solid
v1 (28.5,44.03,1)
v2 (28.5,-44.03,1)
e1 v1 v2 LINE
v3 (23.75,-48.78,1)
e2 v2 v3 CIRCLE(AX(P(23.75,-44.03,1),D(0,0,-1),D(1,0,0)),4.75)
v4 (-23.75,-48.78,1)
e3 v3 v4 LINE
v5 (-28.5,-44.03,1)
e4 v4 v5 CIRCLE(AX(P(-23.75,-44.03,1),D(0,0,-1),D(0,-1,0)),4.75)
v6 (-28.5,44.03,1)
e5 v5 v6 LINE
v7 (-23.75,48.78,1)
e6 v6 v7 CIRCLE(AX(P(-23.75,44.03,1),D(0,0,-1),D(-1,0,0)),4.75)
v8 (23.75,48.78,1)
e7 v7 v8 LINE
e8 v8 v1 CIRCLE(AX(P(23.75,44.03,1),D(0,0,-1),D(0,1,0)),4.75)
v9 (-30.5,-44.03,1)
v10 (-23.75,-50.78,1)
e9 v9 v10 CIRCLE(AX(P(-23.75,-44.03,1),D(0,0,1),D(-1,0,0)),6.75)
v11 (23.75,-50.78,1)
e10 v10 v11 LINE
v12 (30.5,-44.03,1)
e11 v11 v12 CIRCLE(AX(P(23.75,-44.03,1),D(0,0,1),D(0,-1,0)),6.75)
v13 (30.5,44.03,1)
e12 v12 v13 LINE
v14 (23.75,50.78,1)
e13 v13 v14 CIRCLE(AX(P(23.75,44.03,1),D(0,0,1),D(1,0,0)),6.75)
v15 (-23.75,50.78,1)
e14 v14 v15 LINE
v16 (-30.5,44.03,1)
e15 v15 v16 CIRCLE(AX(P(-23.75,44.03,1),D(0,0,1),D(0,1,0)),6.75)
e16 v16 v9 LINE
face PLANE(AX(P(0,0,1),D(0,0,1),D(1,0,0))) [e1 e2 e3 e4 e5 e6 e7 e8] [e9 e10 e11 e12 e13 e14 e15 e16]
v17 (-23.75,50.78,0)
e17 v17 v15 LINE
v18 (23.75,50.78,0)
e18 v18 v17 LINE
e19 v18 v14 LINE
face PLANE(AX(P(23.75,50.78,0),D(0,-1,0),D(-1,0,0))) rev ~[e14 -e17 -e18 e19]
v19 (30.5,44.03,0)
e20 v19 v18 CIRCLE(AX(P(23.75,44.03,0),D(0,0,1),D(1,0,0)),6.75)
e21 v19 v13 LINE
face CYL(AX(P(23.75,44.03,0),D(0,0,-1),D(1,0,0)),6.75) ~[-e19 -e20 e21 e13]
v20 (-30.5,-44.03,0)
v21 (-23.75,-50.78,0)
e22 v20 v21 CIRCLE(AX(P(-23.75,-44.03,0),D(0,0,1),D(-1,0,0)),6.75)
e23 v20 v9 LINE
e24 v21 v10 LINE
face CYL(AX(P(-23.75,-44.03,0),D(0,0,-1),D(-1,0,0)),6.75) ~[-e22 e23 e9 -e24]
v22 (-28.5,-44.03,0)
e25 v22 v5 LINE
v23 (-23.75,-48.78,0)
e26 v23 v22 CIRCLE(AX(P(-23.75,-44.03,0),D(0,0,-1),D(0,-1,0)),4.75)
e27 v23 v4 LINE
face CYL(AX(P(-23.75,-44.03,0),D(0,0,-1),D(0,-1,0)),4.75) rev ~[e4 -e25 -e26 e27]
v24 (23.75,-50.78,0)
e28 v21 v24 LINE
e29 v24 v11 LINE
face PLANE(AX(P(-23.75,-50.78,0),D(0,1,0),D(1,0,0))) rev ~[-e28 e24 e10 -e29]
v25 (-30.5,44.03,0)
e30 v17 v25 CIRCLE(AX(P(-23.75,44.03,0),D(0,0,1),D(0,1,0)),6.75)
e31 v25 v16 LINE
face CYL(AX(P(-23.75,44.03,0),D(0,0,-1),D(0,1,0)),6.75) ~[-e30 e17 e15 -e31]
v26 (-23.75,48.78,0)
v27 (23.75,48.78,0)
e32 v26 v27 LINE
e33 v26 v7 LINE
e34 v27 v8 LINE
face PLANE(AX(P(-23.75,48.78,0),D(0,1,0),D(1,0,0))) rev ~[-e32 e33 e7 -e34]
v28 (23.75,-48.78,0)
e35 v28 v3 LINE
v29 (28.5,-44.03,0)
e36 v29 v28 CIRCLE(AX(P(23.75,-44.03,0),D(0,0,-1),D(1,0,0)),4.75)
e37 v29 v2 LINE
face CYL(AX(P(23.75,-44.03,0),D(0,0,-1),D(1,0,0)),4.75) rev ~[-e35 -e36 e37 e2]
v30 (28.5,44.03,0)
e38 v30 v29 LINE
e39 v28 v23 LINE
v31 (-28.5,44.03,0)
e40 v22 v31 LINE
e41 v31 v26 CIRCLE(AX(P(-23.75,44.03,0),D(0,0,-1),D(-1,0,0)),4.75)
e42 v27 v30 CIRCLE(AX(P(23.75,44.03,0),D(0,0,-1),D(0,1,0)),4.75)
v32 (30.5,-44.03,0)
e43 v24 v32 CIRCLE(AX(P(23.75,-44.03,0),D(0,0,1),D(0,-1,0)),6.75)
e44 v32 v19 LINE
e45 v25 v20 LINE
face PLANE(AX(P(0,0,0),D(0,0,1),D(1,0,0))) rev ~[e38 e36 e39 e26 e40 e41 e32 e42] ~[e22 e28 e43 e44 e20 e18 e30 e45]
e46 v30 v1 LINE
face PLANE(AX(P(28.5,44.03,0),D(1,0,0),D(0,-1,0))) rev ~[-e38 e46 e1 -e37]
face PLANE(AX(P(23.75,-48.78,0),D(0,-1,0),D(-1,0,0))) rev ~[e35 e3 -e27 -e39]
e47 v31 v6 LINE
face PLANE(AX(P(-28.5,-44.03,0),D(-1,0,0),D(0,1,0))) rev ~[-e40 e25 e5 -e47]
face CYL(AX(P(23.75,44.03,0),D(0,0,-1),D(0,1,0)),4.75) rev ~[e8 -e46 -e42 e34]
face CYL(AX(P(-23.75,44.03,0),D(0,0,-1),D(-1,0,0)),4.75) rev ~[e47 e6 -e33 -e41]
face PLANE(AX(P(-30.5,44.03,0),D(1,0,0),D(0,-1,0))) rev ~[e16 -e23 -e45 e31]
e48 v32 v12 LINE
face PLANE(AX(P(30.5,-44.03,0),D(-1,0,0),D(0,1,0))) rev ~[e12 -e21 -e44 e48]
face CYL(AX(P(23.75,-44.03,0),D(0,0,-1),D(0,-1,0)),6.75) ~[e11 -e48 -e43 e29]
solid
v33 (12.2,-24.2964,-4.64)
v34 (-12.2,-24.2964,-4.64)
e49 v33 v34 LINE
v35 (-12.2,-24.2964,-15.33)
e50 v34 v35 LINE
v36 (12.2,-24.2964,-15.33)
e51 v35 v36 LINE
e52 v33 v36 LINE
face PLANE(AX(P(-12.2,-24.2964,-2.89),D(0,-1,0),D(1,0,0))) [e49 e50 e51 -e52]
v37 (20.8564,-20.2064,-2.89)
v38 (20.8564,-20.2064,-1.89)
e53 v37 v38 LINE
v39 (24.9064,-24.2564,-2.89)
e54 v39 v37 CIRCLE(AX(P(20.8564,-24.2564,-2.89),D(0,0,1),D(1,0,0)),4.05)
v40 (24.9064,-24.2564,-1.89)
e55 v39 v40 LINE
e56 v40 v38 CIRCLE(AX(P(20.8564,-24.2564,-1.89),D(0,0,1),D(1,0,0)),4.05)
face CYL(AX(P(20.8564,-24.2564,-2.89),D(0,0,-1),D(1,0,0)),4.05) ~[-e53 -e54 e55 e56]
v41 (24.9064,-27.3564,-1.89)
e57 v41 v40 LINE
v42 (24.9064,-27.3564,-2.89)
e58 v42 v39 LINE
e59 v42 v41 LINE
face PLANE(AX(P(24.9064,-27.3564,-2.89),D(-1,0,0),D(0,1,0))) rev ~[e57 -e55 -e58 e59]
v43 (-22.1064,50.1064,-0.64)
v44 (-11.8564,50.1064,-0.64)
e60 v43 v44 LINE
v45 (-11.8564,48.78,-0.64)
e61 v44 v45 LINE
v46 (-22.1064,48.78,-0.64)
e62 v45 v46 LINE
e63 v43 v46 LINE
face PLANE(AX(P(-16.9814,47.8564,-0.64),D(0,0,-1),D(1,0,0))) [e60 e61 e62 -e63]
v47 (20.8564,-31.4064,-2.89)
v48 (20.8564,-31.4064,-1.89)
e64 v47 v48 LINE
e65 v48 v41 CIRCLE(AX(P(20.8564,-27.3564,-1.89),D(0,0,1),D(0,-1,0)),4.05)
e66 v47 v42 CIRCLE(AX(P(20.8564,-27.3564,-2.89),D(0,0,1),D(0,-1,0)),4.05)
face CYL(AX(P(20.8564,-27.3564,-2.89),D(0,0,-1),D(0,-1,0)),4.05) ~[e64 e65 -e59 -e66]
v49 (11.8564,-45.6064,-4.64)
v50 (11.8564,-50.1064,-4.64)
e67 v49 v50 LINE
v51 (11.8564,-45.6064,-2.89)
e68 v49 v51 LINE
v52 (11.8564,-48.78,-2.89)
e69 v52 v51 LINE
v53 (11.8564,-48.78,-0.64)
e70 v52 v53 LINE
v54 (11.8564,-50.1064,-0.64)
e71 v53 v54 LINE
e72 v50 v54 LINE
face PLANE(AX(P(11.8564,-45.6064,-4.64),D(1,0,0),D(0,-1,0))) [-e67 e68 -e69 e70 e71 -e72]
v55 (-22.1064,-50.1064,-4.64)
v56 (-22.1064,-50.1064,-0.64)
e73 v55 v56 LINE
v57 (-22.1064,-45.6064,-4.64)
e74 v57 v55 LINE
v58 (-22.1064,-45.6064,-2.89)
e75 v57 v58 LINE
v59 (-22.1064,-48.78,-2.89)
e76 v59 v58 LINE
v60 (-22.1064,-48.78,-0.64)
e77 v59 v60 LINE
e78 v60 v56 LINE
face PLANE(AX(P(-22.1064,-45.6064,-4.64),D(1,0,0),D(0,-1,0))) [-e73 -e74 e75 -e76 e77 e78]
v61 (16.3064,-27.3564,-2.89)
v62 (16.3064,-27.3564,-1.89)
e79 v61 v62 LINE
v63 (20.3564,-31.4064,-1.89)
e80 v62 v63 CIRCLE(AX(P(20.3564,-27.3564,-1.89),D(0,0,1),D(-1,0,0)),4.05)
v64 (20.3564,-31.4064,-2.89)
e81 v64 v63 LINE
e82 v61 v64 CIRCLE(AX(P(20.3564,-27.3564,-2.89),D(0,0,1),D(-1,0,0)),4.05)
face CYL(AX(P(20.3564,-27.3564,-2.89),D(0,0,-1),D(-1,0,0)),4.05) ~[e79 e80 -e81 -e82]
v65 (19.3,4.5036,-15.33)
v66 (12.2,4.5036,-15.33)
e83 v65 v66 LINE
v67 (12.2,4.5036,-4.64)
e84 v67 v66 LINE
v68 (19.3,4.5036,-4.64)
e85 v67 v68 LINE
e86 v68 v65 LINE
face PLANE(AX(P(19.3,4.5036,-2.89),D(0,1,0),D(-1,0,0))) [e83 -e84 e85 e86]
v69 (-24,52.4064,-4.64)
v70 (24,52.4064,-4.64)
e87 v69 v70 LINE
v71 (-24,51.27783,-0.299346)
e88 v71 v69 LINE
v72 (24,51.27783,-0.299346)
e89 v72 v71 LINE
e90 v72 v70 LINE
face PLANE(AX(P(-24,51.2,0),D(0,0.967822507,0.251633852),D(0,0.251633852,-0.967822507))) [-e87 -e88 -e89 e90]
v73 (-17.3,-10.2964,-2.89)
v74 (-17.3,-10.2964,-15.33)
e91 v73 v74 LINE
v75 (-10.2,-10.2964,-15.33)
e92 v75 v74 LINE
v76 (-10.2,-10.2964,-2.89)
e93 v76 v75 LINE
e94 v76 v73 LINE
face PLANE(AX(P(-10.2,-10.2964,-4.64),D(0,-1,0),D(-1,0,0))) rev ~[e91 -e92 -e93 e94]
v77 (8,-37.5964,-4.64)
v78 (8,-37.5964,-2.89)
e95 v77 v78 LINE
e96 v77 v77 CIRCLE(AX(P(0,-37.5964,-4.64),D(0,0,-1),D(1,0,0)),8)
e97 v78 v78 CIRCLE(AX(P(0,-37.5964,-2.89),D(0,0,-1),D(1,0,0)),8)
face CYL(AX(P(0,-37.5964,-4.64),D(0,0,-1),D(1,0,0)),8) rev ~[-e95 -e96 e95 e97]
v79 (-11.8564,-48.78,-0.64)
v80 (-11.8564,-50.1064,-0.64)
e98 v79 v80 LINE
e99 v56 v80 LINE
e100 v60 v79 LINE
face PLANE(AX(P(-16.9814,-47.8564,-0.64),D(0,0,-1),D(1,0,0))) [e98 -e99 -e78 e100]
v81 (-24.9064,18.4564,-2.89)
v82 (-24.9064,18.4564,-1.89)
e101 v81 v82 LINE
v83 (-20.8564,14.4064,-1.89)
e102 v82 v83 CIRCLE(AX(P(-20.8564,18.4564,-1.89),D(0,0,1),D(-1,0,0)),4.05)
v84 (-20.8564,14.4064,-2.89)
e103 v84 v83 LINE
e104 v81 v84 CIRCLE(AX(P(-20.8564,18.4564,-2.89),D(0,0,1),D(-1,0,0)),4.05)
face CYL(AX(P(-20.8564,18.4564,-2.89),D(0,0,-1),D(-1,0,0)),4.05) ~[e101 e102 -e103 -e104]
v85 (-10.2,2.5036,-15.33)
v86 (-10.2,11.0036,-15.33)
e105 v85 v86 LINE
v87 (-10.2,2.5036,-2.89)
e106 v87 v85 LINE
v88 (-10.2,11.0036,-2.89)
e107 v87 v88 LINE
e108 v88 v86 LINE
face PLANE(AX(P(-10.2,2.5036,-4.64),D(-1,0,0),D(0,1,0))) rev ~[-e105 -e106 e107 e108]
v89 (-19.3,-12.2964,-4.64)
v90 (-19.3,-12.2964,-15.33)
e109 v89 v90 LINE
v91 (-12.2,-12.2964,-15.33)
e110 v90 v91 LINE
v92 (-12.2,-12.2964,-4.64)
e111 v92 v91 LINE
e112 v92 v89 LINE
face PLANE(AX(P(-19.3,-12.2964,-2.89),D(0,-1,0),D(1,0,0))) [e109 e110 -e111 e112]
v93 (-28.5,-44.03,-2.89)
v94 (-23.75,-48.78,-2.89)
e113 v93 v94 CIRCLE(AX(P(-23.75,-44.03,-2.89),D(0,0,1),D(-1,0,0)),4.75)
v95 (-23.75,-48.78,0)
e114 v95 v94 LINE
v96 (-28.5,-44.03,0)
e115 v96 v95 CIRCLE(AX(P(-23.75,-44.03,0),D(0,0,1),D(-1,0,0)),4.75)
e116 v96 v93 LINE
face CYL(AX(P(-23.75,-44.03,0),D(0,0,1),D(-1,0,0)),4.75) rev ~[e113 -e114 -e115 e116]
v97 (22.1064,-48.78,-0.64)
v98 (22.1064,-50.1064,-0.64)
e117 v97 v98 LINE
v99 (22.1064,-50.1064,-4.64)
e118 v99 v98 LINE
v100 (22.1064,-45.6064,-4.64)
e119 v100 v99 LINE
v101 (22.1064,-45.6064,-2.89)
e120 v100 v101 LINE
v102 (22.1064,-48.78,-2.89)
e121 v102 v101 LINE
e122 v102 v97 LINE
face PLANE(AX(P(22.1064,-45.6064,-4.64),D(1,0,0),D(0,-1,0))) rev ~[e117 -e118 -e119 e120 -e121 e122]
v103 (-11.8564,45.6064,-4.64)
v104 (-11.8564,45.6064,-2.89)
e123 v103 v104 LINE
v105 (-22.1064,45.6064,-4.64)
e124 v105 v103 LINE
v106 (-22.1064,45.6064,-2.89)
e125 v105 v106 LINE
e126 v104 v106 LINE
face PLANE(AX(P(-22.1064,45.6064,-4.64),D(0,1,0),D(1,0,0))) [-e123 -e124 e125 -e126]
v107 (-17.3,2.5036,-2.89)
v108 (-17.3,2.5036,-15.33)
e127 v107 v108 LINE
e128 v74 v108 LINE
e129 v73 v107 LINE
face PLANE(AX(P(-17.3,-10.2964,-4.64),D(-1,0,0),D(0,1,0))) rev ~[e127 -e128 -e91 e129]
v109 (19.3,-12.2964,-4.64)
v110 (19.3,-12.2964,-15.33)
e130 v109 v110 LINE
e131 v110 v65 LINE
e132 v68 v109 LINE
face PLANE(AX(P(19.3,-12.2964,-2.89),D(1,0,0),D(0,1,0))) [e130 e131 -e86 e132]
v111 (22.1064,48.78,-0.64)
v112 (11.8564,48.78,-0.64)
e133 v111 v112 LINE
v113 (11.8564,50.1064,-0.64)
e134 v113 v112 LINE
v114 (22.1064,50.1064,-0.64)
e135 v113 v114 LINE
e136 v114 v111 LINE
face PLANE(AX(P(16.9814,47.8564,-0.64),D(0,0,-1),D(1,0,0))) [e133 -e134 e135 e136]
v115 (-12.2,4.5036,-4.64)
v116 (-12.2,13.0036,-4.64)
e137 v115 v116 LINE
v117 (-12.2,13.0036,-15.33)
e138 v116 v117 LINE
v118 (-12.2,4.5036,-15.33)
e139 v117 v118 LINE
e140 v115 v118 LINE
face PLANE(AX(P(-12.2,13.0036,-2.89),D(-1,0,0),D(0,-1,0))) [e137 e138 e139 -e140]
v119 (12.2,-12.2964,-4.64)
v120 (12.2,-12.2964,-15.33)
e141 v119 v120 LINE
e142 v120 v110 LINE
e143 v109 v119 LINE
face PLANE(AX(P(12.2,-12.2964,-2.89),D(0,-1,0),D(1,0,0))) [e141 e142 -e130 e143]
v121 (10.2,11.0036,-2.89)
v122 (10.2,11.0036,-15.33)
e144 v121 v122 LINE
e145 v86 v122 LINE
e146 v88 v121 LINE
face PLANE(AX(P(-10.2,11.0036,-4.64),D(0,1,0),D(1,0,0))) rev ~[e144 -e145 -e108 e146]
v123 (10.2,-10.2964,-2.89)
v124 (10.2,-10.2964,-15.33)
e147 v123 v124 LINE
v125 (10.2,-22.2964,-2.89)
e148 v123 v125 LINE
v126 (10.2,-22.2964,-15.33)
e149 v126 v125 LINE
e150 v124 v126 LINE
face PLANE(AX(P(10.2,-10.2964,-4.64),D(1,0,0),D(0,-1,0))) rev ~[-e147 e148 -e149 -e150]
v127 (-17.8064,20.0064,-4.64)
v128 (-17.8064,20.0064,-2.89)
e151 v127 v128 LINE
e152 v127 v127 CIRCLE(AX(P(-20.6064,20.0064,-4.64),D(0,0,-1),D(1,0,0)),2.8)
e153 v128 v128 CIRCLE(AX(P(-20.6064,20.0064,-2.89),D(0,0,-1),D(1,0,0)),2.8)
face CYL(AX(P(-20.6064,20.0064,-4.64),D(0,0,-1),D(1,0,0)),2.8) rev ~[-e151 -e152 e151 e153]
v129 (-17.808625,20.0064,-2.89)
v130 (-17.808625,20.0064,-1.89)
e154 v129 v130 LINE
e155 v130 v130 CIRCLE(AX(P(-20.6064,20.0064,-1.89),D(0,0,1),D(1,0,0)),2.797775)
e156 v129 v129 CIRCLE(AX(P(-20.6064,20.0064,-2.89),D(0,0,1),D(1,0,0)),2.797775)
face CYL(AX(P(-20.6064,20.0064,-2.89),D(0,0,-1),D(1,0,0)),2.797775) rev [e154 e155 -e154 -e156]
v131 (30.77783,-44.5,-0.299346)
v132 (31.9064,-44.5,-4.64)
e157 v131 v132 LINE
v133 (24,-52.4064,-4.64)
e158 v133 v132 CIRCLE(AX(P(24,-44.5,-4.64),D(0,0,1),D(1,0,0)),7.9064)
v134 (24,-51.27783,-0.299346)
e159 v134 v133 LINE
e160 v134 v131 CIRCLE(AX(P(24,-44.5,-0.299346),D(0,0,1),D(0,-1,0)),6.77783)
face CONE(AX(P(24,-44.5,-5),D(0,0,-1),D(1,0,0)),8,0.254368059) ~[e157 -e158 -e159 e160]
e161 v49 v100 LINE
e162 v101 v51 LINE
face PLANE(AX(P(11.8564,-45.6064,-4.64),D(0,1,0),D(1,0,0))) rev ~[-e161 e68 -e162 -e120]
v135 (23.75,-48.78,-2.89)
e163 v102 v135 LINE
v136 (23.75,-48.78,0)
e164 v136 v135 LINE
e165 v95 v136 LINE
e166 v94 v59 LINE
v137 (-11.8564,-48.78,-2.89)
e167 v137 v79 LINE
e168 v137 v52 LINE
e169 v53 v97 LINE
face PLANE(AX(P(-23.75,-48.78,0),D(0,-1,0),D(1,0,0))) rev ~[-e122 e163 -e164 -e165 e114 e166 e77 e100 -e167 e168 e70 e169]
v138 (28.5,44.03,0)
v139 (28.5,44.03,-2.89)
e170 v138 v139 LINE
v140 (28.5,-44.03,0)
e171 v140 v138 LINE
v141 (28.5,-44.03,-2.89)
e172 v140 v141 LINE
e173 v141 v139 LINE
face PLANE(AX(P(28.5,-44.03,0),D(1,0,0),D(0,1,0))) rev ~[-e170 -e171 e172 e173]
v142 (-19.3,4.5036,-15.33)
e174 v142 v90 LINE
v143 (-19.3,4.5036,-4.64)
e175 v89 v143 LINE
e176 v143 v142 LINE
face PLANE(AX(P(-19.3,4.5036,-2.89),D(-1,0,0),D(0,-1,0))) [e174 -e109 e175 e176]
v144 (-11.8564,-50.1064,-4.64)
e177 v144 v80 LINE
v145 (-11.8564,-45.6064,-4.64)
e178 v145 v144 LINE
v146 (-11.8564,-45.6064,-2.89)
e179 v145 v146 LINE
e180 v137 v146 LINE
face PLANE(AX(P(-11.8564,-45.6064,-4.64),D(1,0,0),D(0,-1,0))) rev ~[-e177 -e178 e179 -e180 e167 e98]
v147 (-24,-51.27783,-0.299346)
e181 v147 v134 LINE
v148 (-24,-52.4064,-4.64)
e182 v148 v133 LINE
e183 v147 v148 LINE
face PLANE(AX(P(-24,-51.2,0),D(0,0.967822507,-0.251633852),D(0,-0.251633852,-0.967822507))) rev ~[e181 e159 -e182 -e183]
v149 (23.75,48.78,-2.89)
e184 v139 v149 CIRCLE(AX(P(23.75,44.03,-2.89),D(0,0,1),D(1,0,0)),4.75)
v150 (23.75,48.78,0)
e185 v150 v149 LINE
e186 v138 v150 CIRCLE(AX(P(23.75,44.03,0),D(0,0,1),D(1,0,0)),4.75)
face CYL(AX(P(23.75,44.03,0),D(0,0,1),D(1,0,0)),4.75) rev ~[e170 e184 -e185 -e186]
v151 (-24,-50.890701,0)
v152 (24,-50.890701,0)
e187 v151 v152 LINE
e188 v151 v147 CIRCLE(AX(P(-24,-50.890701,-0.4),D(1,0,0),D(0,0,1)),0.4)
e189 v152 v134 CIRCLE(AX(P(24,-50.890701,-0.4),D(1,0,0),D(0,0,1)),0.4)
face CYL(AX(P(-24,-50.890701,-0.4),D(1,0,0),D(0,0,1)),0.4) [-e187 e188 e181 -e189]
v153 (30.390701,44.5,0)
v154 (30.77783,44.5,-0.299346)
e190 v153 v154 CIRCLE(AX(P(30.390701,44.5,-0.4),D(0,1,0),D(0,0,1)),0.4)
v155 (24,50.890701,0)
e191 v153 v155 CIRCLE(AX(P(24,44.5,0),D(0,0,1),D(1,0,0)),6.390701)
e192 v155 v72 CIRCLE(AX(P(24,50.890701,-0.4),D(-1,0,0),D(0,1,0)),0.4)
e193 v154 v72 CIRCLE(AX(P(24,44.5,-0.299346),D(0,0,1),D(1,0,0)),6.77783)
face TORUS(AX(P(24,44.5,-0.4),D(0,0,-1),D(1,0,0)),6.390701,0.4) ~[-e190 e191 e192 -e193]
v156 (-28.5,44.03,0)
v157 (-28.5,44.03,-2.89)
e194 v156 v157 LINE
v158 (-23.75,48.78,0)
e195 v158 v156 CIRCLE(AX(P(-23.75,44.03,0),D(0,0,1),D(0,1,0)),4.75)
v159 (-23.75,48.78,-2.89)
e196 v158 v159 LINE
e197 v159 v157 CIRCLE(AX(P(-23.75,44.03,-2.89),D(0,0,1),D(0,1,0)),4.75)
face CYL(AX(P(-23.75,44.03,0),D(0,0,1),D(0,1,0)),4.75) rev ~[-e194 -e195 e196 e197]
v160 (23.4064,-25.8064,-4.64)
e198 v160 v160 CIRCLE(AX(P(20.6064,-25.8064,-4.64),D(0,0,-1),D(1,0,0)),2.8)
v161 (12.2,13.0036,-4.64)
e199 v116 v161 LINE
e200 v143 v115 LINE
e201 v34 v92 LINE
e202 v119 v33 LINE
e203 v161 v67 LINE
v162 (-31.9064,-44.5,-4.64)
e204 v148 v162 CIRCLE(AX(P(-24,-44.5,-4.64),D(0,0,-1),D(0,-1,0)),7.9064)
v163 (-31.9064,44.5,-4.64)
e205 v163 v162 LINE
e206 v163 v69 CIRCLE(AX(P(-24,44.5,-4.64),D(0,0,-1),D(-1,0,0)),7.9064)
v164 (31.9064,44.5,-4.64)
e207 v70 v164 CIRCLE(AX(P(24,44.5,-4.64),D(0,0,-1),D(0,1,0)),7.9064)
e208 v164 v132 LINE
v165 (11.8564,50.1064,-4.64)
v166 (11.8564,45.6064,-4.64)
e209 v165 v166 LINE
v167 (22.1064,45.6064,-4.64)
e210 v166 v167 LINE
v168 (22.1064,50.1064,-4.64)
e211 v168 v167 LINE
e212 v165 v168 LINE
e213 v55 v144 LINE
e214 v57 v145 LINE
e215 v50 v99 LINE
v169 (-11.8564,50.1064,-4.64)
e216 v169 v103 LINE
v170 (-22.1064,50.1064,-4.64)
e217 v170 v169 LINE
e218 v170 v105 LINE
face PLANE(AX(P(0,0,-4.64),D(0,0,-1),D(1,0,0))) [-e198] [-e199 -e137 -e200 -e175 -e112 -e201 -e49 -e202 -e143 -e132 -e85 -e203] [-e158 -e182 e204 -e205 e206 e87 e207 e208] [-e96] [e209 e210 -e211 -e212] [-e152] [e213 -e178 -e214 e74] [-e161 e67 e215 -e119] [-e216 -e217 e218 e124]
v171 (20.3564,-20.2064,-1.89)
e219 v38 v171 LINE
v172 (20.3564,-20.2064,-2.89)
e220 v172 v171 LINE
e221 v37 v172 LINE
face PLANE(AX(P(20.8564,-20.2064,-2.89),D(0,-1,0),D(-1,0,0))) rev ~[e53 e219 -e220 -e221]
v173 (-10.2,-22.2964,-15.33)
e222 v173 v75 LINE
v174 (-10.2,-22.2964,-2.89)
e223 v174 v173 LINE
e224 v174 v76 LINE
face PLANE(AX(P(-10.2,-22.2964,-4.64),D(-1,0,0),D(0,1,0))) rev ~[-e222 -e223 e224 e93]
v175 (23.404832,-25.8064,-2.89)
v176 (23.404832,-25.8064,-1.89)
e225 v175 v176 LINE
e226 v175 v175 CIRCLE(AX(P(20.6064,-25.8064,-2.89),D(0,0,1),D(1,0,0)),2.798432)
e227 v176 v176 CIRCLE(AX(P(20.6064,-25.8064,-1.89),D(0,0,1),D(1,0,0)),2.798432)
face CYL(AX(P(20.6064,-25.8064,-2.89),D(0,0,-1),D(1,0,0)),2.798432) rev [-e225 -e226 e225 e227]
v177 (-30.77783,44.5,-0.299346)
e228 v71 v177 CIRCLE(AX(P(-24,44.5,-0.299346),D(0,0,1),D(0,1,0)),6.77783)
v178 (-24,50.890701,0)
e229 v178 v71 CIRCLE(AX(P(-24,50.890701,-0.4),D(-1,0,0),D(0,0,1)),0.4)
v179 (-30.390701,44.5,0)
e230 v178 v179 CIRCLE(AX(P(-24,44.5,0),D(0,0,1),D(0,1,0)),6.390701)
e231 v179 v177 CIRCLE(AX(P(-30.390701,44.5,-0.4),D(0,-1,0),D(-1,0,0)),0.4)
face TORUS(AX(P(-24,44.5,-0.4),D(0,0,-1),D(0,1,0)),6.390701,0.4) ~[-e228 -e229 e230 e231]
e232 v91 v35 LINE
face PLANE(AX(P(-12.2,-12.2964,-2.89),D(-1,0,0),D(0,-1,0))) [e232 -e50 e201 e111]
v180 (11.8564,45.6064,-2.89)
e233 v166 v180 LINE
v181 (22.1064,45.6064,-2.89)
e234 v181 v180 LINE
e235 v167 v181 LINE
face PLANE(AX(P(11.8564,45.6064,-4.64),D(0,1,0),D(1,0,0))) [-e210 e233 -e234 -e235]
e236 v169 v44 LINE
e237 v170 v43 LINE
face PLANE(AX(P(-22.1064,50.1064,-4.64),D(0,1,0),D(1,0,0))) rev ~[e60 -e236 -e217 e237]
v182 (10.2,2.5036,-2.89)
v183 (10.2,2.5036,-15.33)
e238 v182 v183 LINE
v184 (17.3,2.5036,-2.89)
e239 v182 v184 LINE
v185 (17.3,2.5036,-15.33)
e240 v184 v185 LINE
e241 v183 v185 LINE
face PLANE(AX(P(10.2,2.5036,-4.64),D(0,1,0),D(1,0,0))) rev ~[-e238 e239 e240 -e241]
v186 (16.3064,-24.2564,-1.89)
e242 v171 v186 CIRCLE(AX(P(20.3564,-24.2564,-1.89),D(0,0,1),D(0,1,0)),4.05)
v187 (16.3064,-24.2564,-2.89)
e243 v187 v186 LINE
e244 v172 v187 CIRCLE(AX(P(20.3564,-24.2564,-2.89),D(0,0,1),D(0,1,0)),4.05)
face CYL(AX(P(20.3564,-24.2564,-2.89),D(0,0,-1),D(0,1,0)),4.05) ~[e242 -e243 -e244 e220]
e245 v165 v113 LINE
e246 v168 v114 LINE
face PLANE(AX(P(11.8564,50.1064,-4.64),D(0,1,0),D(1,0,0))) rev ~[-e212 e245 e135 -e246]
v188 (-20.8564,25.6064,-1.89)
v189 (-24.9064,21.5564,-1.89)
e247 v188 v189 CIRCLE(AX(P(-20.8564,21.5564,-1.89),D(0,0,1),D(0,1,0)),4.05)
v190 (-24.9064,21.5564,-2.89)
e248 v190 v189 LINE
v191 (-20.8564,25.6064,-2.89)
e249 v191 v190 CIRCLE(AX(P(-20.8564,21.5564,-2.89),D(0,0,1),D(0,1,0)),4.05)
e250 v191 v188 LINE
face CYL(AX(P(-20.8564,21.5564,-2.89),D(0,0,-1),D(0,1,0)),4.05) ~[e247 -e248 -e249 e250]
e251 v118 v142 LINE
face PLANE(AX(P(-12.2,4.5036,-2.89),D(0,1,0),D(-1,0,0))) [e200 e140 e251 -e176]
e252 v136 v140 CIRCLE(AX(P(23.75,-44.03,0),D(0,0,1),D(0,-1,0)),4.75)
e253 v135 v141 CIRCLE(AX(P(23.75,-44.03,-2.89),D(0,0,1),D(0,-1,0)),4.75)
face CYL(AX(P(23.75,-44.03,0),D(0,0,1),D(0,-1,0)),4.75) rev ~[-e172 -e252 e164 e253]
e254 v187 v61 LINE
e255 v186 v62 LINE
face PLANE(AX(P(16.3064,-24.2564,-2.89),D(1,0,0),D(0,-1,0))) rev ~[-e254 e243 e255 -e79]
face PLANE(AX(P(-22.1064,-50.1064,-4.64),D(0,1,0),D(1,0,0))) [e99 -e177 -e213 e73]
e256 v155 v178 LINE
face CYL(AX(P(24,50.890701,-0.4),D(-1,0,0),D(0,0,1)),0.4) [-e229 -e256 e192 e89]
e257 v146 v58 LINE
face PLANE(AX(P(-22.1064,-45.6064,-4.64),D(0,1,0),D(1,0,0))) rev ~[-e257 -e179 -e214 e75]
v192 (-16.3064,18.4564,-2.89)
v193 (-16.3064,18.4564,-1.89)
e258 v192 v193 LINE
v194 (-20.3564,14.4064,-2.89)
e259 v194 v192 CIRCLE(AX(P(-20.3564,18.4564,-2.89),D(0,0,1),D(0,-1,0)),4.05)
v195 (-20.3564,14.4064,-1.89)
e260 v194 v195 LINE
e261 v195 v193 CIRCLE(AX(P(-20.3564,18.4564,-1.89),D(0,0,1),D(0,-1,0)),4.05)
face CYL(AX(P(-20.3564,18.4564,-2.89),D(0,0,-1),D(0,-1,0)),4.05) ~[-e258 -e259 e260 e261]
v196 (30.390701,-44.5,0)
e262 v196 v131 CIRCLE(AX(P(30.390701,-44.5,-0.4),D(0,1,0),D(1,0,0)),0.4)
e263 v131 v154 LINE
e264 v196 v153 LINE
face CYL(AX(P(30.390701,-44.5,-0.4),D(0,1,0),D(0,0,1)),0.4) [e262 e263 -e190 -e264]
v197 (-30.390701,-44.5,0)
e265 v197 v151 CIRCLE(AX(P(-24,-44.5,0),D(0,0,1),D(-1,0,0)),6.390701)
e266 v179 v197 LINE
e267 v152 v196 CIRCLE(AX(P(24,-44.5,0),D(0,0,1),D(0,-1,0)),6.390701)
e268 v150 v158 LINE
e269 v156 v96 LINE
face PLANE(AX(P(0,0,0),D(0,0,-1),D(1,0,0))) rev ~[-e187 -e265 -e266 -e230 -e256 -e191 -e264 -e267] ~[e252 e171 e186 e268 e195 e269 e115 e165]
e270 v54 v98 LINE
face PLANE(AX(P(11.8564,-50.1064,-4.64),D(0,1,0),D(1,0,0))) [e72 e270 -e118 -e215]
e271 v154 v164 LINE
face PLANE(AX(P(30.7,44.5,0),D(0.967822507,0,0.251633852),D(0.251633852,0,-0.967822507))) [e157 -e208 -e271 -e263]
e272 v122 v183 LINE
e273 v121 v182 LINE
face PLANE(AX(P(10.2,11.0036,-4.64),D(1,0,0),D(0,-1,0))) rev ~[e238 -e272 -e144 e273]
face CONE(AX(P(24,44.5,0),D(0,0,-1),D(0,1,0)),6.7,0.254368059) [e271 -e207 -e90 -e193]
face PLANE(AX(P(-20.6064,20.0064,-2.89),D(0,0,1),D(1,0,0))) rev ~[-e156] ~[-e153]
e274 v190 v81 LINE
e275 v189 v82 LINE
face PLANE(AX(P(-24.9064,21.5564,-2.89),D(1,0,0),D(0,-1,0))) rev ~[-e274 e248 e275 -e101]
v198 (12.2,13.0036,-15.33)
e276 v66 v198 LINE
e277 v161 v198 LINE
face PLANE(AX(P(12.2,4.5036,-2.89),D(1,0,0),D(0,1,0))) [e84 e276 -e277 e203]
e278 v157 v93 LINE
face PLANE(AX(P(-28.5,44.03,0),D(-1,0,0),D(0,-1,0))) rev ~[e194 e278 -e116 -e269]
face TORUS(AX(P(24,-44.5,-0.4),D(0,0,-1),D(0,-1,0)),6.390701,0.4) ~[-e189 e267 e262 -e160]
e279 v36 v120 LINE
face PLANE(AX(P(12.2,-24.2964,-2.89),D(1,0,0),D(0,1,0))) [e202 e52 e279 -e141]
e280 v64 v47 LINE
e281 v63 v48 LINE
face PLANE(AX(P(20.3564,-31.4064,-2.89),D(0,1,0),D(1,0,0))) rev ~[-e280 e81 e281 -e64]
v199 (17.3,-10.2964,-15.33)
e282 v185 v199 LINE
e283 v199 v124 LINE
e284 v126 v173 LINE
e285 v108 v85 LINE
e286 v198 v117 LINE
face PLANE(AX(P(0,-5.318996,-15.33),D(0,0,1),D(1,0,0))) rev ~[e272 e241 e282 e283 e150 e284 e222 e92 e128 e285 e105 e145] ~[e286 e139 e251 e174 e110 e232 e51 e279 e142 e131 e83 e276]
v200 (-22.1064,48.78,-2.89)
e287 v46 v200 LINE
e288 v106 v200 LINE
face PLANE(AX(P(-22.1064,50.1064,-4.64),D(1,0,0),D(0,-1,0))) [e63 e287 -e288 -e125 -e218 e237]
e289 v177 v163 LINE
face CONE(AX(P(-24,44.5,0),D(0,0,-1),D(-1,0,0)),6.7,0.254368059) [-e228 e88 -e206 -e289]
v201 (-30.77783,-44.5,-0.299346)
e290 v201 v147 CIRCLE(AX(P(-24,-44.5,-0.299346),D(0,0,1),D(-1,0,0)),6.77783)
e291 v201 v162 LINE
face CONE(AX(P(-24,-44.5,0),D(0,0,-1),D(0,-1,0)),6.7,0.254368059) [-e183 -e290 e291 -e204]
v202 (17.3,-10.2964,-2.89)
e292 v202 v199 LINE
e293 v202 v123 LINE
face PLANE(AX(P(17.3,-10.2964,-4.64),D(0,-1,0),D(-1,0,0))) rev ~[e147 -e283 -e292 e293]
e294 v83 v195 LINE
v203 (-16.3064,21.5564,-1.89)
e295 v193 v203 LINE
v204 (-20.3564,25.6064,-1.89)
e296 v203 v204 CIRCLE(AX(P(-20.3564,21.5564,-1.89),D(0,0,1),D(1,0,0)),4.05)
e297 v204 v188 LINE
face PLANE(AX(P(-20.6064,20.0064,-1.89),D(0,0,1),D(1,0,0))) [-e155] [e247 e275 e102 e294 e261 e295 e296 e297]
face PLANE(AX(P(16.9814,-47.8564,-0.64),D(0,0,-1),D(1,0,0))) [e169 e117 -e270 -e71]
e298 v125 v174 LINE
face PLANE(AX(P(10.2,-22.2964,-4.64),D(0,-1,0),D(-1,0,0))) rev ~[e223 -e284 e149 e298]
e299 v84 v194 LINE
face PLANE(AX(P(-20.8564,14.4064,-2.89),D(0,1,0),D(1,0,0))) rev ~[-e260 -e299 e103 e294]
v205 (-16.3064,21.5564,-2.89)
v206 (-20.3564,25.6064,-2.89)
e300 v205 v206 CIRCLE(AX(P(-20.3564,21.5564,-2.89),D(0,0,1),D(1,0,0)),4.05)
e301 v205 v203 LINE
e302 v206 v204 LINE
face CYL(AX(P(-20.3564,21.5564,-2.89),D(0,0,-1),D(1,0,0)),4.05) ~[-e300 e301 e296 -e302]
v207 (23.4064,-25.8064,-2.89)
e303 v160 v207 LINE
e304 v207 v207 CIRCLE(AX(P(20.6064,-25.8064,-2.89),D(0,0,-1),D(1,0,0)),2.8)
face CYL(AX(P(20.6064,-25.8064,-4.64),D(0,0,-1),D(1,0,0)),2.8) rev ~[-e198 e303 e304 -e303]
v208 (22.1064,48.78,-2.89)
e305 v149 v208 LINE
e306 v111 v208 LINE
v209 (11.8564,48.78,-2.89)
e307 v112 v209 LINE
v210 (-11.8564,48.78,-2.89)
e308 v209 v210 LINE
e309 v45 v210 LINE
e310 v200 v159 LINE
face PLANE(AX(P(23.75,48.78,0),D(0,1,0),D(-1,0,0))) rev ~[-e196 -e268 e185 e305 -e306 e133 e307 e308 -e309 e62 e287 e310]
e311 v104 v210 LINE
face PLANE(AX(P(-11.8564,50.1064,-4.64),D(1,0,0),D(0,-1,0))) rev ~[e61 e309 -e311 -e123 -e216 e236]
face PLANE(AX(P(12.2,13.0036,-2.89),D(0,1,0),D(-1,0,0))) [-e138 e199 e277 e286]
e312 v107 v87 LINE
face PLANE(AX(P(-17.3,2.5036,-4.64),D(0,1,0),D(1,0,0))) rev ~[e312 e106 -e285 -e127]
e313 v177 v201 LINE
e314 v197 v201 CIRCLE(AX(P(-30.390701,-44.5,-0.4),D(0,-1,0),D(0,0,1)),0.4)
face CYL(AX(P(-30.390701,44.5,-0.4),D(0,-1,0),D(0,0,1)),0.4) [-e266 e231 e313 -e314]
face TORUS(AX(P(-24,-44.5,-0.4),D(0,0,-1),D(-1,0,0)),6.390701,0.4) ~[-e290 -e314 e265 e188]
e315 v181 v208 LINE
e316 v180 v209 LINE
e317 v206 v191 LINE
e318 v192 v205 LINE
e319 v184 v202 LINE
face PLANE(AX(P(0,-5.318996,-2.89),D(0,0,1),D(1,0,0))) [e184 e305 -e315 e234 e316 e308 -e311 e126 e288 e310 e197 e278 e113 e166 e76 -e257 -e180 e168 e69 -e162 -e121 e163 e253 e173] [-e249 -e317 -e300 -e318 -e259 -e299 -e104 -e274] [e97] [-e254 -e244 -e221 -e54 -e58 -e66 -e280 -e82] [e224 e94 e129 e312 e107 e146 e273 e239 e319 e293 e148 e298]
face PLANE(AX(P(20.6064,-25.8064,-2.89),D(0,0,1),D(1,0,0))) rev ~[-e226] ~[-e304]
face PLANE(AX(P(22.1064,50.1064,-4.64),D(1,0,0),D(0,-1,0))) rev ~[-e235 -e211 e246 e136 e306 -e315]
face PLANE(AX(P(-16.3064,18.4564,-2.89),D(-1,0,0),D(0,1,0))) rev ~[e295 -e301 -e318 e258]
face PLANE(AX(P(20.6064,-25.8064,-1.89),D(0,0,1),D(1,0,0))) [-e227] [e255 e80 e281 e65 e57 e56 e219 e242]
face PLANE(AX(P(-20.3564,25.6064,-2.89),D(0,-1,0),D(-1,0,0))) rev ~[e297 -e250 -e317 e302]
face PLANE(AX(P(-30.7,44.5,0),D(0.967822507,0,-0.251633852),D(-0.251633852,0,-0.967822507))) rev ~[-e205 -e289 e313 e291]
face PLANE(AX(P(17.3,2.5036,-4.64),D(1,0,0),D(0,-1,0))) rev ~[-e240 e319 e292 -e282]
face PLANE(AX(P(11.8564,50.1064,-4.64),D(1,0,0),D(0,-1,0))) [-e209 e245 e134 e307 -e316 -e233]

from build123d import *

# Parameters (mm, degrees)
F1_DEPTH     = 1
F4_DEPTH     = 4.64
F5_T1_DEPTH  = 48
F5_T3_DEPTH  = 89
F5_T6_ANGLE  = 90
F5_T8_ANGLE  = 90
F5_T10_ANGLE = 90
F5_T12_ANGLE = 90
F7_DEPTH     = 2.89
F8_R         = 0.4
F9_W         = 10.25
F9_H         = 4.5
F9_R         = 8
F9_R_2       = 2.8
F10_DEPTH    = 4
F11_R        = 2.7984324094
F11_R_2      = 2.7977753944
F12_DEPTH    = 1
F14_DEPTH    = 12.44
F16_DEPTH    = 1.75


# Not quite as in the source:
# - a fillet or chamfer that OpenCascade refuses, or shapes differently, is made with other operations: its cross-section is extruded or revolved along the edge and cut away or added


with BuildPart() as f1:
    # F0 (on Top) → F1 (new body)
    with BuildSketch(Plane.XY):
        with BuildLine():
            Line((23.75, 50.78), (0, 50.78))
            Line((0, 50.78), (-23.75, 50.78))
            ThreePointArc((-23.75, 50.78), (-28.522970773, 48.802970773), (-30.5, 44.03))
            Line((-30.5, 44.03), (-30.5, -44.03))
            ThreePointArc((-30.5, -44.03), (-28.522970773, -48.802970773), (-23.75, -50.78))
            Line((-23.75, -50.78), (0, -50.78))
            Line((0, -50.78), (23.75, -50.78))
            ThreePointArc((23.75, -50.78), (28.522970773, -48.802970773), (30.5, -44.03))
            Line((30.5, -44.03), (30.5, 44.03))
            ThreePointArc((30.5, 44.03), (28.522970773, 48.802970773), (23.75, 50.78))
        make_face()
        with BuildLine():
            Line((-23.75, 48.78), (0, 48.78))
            Line((0, 48.78), (23.75, 48.78))
            ThreePointArc((23.75, 48.78), (27.1087572106, 47.3887572106), (28.5, 44.03))
            Line((28.5, 44.03), (28.5, -44.03))
            ThreePointArc((28.5, -44.03), (27.1087572106, -47.3887572106), (23.75, -48.78))
            Line((23.75, -48.78), (0, -48.78))
            Line((0, -48.78), (-23.75, -48.78))
            ThreePointArc((-23.75, -48.78), (-27.1087572106, -47.3887572106), (-28.5, -44.03))
            Line((-28.5, -44.03), (-28.5, 44.03))
            ThreePointArc((-28.5, 44.03), (-27.1087572106, 47.3887572106), (-23.75, 48.78))
        make_face(mode=Mode.SUBTRACT)
    extrude(amount=F1_DEPTH)


with BuildPart() as f4:
    # F3 (on offset) → F4 (new body, through all)
    with BuildSketch(Plane(origin=(0, 0, -4.64), x_dir=(1, 0, 0), z_dir=(0, 0, -1))):
        with BuildLine():
            Line((24, 52.5), (0, 52.5))
            Line((0, 52.5), (-24, 52.5))
            ThreePointArc((-24, 52.5), (-29.6568542495, 50.1568542495), (-32, 44.5))
            Line((-32, 44.5), (-32, 0))
            Line((-32, 0), (-32, -44.5))
            ThreePointArc((-32, -44.5), (-29.6568542495, -50.1568542495), (-24, -52.5))
            Line((-24, -52.5), (0, -52.5))
            Line((0, -52.5), (24, -52.5))
            ThreePointArc((24, -52.5), (29.6568542495, -50.1568542495), (32, -44.5))
            Line((32, -44.5), (32, 0))
            Line((32, 0), (32, 44.5))
            ThreePointArc((32, 44.5), (29.6568542495, 50.1568542495), (24, 52.5))
        make_face()
    extrude(amount=-F4_DEPTH)

    # F5: chamfer of 1.3 x 5 on 8 edges, made by hand

    # F5_s2 → F5_t1 (cut)
    with BuildSketch(Plane.YZ.offset(-24)):
        Polygon((51.2, 0), (52.5, -5), (52.5, 0), align=None)
        Polygon((-51.2, 0), (-52.5, -5), (-52.5, 0), align=None)
    extrude(amount=F5_T1_DEPTH, mode=Mode.SUBTRACT)

    # F5_s4 → F5_t3 (cut)
    with BuildSketch(Plane.XZ.offset(-44.5)):
        Polygon((-30.7, 0), (-32, -5), (-32, 0), align=None)
        Polygon((30.7, 0), (32, -5), (32, 0), align=None)
    extrude(amount=F5_T3_DEPTH, mode=Mode.SUBTRACT)

    # F5_s5 → F5_t6 (revolve, cut)
    with BuildSketch(Plane.XZ.offset(44.5)):
        Polygon((32, -5), (30.7, 0), (32, 0), align=None)
    revolve(axis=Axis((24, -44.5, 0), (0, 0, -1)), revolution_arc=F5_T6_ANGLE, mode=Mode.SUBTRACT)

    # F5_s7 → F5_t8 (revolve, cut)
    with BuildSketch(Plane.YZ.offset(-24)):
        Polygon((-51.2, 0), (-52.5, -5), (-52.5, 0), align=None)
    revolve(axis=Axis((-24, -44.5, 0), (0, 0, -1)), revolution_arc=F5_T8_ANGLE, mode=Mode.SUBTRACT)

    # F5_s9 → F5_t10 (revolve, cut)
    with BuildSketch(Plane.XZ.offset(-44.5)):
        Polygon((-30.7, 0), (-32, -5), (-32, 0), align=None)
    revolve(axis=Axis((-24, 44.5, 0), (0, 0, -1)), revolution_arc=F5_T10_ANGLE, mode=Mode.SUBTRACT)

    # F5_s11 → F5_t12 (revolve, cut)
    with BuildSketch(Plane.YZ.offset(24)):
        Polygon((51.2, 0), (52.5, -5), (52.5, 0), align=None)
    revolve(axis=Axis((24, 44.5, 0), (0, 0, -1)), revolution_arc=F5_T12_ANGLE, mode=Mode.SUBTRACT)

    # F6 (on Top) → F7 (cut)
    with BuildSketch(Plane.XY):
        with BuildLine():
            Line((23.75, 48.78), (0, 48.78))
            Line((0, 48.78), (-23.75, 48.78))
            ThreePointArc((-23.75, 48.78), (-27.1087572106, 47.3887572106), (-28.5, 44.03))
            Line((-28.5, 44.03), (-28.5, -44.03))
            ThreePointArc((-28.5, -44.03), (-27.1087572106, -47.3887572106), (-23.75, -48.78))
            Line((-23.75, -48.78), (0, -48.78))
            Line((0, -48.78), (23.75, -48.78))
            ThreePointArc((23.75, -48.78), (27.1087572106, -47.3887572106), (28.5, -44.03))
            Line((28.5, -44.03), (28.5, 44.03))
            ThreePointArc((28.5, 44.03), (27.1087572106, 47.3887572106), (23.75, 48.78))
        make_face()
    extrude(amount=-F7_DEPTH, mode=Mode.SUBTRACT)

    # F8
    f8_edges = [f4.edges().sort_by_distance(p)[0] for p in [
        (0, -51.2, 0),
        (30.7, 0, 0),
        (28.737615, 49.237615, 0),
        (28.737615, -49.237615, 0),
        (0, 51.2, 0),
        (-28.737615, 49.237615, 0),
        (-30.7, 0, 0),
        (-28.737615, -49.237615, 0),
    ]]
    fillet(f8_edges, radius=F8_R)

    # F9 (on face) → F10 (cut)
    with BuildSketch(Plane(origin=(0, 0, -4.64), x_dir=(1, 0, 0), z_dir=(0, 0, -1))):
        with Locations((-16.9814, 47.8564)):
            Rectangle(F9_W, F9_H)
        with Locations((16.9814, 47.8564)):
            Rectangle(F9_W, F9_H)
        with Locations((-16.9814, -47.8564)):
            Rectangle(F9_W, F9_H)
        with Locations((16.9814, -47.8564)):
            Rectangle(F9_W, F9_H)
        with Locations((0, 37.5964)):
            Circle(F9_R)
        with Locations((20.6064, 25.8064)):
            Circle(F9_R_2)
        with Locations((-20.6064, -20.0064)):
            Circle(F9_R_2)
    extrude(amount=-F10_DEPTH, mode=Mode.SUBTRACT)

    # F11 (on face) → F12 (join)
    with BuildSketch(Plane.XY.offset(-2.89)):
        with BuildLine():
            Line((20.8564, -20.2064), (20.3564, -20.2064))
            ThreePointArc((20.3564, -20.2064), (17.4926175362, -21.3926175362), (16.3064, -24.2564))
            Line((16.3064, -24.2564), (16.3064, -27.3564))
            ThreePointArc((16.3064, -27.3564), (17.4926175362, -30.2201824638), (20.3564, -31.4064))
            Line((20.3564, -31.4064), (20.8564, -31.4064))
            ThreePointArc((20.8564, -31.4064), (23.7201824638, -30.2201824638), (24.9064, -27.3564))
            Line((24.9064, -27.3564), (24.9064, -24.2564))
            ThreePointArc((24.9064, -24.2564), (23.7201824638, -21.3926175362), (20.8564, -20.2064))
        make_face()
        with Locations((20.6064, -25.8064)):
            Circle(F11_R, mode=Mode.SUBTRACT)
        with BuildLine():
            Line((-20.3564, 25.6064), (-20.8564, 25.6064))
            ThreePointArc((-20.8564, 25.6064), (-23.7201824638, 24.4201824638), (-24.9064, 21.5564))
            Line((-24.9064, 21.5564), (-24.9064, 18.4564))
            ThreePointArc((-24.9064, 18.4564), (-23.7201824638, 15.5926175362), (-20.8564, 14.4064))
            Line((-20.8564, 14.4064), (-20.3564, 14.4064))
            ThreePointArc((-20.3564, 14.4064), (-17.4926175362, 15.5926175362), (-16.3064, 18.4564))
            Line((-16.3064, 18.4564), (-16.3064, 21.5564))
            ThreePointArc((-16.3064, 21.5564), (-17.4926175362, 24.4201824638), (-20.3564, 25.6064))
        make_face()
        with Locations((-20.6064, 20.0064)):
            Circle(F11_R_2, mode=Mode.SUBTRACT)
    extrude(amount=F12_DEPTH)

    # F13 (on face) → F14 (join)
    with BuildSketch(Plane.XY.offset(-2.89)):
        Polygon((12.2, 13.0036), (0, 13.0036), (-12.2, 13.0036), (-12.2, 4.5036), (-19.3, 4.5036), (-19.3, -12.2964), (-12.2, -12.2964), (-12.2, -24.2964), (0, -24.2964), (12.2, -24.2964), (12.2, -12.2964), (19.3, -12.2964), (19.3, 4.5036), (12.2, 4.5036), align=None)
        Polygon((10.2, -22.2964), (0, -22.2964), (-10.2, -22.2964), (-10.2, -10.2964), (-17.3, -10.2964), (-17.3, 2.5036), (-10.2, 2.5036), (-10.2, 11.0036), (0, 11.0036), (10.2, 11.0036), (10.2, 2.5036), (17.3, 2.5036), (17.3, -10.2964), (10.2, -10.2964), align=None, mode=Mode.SUBTRACT)
    extrude(amount=-F14_DEPTH)

    # F15 (on face) → F16 (cut, through all)
    with BuildSketch(Plane(origin=(0, 0, -4.64), x_dir=(1, 0, 0), z_dir=(0, 0, -1))):
        Polygon((10.2, 22.2964), (-10.2, 22.2964), (-10.2, 10.2964), (-17.3, 10.2964), (-17.3, -2.5036), (-10.2, -2.5036), (-10.2, -11.0036), (10.2, -11.0036), (10.2, -2.5036), (17.3, -2.5036), (17.3, 10.2964), (10.2, 10.2964), align=None)
    extrude(amount=-F16_DEPTH, mode=Mode.SUBTRACT)


solid = Compound([f1.part, f4.part])
